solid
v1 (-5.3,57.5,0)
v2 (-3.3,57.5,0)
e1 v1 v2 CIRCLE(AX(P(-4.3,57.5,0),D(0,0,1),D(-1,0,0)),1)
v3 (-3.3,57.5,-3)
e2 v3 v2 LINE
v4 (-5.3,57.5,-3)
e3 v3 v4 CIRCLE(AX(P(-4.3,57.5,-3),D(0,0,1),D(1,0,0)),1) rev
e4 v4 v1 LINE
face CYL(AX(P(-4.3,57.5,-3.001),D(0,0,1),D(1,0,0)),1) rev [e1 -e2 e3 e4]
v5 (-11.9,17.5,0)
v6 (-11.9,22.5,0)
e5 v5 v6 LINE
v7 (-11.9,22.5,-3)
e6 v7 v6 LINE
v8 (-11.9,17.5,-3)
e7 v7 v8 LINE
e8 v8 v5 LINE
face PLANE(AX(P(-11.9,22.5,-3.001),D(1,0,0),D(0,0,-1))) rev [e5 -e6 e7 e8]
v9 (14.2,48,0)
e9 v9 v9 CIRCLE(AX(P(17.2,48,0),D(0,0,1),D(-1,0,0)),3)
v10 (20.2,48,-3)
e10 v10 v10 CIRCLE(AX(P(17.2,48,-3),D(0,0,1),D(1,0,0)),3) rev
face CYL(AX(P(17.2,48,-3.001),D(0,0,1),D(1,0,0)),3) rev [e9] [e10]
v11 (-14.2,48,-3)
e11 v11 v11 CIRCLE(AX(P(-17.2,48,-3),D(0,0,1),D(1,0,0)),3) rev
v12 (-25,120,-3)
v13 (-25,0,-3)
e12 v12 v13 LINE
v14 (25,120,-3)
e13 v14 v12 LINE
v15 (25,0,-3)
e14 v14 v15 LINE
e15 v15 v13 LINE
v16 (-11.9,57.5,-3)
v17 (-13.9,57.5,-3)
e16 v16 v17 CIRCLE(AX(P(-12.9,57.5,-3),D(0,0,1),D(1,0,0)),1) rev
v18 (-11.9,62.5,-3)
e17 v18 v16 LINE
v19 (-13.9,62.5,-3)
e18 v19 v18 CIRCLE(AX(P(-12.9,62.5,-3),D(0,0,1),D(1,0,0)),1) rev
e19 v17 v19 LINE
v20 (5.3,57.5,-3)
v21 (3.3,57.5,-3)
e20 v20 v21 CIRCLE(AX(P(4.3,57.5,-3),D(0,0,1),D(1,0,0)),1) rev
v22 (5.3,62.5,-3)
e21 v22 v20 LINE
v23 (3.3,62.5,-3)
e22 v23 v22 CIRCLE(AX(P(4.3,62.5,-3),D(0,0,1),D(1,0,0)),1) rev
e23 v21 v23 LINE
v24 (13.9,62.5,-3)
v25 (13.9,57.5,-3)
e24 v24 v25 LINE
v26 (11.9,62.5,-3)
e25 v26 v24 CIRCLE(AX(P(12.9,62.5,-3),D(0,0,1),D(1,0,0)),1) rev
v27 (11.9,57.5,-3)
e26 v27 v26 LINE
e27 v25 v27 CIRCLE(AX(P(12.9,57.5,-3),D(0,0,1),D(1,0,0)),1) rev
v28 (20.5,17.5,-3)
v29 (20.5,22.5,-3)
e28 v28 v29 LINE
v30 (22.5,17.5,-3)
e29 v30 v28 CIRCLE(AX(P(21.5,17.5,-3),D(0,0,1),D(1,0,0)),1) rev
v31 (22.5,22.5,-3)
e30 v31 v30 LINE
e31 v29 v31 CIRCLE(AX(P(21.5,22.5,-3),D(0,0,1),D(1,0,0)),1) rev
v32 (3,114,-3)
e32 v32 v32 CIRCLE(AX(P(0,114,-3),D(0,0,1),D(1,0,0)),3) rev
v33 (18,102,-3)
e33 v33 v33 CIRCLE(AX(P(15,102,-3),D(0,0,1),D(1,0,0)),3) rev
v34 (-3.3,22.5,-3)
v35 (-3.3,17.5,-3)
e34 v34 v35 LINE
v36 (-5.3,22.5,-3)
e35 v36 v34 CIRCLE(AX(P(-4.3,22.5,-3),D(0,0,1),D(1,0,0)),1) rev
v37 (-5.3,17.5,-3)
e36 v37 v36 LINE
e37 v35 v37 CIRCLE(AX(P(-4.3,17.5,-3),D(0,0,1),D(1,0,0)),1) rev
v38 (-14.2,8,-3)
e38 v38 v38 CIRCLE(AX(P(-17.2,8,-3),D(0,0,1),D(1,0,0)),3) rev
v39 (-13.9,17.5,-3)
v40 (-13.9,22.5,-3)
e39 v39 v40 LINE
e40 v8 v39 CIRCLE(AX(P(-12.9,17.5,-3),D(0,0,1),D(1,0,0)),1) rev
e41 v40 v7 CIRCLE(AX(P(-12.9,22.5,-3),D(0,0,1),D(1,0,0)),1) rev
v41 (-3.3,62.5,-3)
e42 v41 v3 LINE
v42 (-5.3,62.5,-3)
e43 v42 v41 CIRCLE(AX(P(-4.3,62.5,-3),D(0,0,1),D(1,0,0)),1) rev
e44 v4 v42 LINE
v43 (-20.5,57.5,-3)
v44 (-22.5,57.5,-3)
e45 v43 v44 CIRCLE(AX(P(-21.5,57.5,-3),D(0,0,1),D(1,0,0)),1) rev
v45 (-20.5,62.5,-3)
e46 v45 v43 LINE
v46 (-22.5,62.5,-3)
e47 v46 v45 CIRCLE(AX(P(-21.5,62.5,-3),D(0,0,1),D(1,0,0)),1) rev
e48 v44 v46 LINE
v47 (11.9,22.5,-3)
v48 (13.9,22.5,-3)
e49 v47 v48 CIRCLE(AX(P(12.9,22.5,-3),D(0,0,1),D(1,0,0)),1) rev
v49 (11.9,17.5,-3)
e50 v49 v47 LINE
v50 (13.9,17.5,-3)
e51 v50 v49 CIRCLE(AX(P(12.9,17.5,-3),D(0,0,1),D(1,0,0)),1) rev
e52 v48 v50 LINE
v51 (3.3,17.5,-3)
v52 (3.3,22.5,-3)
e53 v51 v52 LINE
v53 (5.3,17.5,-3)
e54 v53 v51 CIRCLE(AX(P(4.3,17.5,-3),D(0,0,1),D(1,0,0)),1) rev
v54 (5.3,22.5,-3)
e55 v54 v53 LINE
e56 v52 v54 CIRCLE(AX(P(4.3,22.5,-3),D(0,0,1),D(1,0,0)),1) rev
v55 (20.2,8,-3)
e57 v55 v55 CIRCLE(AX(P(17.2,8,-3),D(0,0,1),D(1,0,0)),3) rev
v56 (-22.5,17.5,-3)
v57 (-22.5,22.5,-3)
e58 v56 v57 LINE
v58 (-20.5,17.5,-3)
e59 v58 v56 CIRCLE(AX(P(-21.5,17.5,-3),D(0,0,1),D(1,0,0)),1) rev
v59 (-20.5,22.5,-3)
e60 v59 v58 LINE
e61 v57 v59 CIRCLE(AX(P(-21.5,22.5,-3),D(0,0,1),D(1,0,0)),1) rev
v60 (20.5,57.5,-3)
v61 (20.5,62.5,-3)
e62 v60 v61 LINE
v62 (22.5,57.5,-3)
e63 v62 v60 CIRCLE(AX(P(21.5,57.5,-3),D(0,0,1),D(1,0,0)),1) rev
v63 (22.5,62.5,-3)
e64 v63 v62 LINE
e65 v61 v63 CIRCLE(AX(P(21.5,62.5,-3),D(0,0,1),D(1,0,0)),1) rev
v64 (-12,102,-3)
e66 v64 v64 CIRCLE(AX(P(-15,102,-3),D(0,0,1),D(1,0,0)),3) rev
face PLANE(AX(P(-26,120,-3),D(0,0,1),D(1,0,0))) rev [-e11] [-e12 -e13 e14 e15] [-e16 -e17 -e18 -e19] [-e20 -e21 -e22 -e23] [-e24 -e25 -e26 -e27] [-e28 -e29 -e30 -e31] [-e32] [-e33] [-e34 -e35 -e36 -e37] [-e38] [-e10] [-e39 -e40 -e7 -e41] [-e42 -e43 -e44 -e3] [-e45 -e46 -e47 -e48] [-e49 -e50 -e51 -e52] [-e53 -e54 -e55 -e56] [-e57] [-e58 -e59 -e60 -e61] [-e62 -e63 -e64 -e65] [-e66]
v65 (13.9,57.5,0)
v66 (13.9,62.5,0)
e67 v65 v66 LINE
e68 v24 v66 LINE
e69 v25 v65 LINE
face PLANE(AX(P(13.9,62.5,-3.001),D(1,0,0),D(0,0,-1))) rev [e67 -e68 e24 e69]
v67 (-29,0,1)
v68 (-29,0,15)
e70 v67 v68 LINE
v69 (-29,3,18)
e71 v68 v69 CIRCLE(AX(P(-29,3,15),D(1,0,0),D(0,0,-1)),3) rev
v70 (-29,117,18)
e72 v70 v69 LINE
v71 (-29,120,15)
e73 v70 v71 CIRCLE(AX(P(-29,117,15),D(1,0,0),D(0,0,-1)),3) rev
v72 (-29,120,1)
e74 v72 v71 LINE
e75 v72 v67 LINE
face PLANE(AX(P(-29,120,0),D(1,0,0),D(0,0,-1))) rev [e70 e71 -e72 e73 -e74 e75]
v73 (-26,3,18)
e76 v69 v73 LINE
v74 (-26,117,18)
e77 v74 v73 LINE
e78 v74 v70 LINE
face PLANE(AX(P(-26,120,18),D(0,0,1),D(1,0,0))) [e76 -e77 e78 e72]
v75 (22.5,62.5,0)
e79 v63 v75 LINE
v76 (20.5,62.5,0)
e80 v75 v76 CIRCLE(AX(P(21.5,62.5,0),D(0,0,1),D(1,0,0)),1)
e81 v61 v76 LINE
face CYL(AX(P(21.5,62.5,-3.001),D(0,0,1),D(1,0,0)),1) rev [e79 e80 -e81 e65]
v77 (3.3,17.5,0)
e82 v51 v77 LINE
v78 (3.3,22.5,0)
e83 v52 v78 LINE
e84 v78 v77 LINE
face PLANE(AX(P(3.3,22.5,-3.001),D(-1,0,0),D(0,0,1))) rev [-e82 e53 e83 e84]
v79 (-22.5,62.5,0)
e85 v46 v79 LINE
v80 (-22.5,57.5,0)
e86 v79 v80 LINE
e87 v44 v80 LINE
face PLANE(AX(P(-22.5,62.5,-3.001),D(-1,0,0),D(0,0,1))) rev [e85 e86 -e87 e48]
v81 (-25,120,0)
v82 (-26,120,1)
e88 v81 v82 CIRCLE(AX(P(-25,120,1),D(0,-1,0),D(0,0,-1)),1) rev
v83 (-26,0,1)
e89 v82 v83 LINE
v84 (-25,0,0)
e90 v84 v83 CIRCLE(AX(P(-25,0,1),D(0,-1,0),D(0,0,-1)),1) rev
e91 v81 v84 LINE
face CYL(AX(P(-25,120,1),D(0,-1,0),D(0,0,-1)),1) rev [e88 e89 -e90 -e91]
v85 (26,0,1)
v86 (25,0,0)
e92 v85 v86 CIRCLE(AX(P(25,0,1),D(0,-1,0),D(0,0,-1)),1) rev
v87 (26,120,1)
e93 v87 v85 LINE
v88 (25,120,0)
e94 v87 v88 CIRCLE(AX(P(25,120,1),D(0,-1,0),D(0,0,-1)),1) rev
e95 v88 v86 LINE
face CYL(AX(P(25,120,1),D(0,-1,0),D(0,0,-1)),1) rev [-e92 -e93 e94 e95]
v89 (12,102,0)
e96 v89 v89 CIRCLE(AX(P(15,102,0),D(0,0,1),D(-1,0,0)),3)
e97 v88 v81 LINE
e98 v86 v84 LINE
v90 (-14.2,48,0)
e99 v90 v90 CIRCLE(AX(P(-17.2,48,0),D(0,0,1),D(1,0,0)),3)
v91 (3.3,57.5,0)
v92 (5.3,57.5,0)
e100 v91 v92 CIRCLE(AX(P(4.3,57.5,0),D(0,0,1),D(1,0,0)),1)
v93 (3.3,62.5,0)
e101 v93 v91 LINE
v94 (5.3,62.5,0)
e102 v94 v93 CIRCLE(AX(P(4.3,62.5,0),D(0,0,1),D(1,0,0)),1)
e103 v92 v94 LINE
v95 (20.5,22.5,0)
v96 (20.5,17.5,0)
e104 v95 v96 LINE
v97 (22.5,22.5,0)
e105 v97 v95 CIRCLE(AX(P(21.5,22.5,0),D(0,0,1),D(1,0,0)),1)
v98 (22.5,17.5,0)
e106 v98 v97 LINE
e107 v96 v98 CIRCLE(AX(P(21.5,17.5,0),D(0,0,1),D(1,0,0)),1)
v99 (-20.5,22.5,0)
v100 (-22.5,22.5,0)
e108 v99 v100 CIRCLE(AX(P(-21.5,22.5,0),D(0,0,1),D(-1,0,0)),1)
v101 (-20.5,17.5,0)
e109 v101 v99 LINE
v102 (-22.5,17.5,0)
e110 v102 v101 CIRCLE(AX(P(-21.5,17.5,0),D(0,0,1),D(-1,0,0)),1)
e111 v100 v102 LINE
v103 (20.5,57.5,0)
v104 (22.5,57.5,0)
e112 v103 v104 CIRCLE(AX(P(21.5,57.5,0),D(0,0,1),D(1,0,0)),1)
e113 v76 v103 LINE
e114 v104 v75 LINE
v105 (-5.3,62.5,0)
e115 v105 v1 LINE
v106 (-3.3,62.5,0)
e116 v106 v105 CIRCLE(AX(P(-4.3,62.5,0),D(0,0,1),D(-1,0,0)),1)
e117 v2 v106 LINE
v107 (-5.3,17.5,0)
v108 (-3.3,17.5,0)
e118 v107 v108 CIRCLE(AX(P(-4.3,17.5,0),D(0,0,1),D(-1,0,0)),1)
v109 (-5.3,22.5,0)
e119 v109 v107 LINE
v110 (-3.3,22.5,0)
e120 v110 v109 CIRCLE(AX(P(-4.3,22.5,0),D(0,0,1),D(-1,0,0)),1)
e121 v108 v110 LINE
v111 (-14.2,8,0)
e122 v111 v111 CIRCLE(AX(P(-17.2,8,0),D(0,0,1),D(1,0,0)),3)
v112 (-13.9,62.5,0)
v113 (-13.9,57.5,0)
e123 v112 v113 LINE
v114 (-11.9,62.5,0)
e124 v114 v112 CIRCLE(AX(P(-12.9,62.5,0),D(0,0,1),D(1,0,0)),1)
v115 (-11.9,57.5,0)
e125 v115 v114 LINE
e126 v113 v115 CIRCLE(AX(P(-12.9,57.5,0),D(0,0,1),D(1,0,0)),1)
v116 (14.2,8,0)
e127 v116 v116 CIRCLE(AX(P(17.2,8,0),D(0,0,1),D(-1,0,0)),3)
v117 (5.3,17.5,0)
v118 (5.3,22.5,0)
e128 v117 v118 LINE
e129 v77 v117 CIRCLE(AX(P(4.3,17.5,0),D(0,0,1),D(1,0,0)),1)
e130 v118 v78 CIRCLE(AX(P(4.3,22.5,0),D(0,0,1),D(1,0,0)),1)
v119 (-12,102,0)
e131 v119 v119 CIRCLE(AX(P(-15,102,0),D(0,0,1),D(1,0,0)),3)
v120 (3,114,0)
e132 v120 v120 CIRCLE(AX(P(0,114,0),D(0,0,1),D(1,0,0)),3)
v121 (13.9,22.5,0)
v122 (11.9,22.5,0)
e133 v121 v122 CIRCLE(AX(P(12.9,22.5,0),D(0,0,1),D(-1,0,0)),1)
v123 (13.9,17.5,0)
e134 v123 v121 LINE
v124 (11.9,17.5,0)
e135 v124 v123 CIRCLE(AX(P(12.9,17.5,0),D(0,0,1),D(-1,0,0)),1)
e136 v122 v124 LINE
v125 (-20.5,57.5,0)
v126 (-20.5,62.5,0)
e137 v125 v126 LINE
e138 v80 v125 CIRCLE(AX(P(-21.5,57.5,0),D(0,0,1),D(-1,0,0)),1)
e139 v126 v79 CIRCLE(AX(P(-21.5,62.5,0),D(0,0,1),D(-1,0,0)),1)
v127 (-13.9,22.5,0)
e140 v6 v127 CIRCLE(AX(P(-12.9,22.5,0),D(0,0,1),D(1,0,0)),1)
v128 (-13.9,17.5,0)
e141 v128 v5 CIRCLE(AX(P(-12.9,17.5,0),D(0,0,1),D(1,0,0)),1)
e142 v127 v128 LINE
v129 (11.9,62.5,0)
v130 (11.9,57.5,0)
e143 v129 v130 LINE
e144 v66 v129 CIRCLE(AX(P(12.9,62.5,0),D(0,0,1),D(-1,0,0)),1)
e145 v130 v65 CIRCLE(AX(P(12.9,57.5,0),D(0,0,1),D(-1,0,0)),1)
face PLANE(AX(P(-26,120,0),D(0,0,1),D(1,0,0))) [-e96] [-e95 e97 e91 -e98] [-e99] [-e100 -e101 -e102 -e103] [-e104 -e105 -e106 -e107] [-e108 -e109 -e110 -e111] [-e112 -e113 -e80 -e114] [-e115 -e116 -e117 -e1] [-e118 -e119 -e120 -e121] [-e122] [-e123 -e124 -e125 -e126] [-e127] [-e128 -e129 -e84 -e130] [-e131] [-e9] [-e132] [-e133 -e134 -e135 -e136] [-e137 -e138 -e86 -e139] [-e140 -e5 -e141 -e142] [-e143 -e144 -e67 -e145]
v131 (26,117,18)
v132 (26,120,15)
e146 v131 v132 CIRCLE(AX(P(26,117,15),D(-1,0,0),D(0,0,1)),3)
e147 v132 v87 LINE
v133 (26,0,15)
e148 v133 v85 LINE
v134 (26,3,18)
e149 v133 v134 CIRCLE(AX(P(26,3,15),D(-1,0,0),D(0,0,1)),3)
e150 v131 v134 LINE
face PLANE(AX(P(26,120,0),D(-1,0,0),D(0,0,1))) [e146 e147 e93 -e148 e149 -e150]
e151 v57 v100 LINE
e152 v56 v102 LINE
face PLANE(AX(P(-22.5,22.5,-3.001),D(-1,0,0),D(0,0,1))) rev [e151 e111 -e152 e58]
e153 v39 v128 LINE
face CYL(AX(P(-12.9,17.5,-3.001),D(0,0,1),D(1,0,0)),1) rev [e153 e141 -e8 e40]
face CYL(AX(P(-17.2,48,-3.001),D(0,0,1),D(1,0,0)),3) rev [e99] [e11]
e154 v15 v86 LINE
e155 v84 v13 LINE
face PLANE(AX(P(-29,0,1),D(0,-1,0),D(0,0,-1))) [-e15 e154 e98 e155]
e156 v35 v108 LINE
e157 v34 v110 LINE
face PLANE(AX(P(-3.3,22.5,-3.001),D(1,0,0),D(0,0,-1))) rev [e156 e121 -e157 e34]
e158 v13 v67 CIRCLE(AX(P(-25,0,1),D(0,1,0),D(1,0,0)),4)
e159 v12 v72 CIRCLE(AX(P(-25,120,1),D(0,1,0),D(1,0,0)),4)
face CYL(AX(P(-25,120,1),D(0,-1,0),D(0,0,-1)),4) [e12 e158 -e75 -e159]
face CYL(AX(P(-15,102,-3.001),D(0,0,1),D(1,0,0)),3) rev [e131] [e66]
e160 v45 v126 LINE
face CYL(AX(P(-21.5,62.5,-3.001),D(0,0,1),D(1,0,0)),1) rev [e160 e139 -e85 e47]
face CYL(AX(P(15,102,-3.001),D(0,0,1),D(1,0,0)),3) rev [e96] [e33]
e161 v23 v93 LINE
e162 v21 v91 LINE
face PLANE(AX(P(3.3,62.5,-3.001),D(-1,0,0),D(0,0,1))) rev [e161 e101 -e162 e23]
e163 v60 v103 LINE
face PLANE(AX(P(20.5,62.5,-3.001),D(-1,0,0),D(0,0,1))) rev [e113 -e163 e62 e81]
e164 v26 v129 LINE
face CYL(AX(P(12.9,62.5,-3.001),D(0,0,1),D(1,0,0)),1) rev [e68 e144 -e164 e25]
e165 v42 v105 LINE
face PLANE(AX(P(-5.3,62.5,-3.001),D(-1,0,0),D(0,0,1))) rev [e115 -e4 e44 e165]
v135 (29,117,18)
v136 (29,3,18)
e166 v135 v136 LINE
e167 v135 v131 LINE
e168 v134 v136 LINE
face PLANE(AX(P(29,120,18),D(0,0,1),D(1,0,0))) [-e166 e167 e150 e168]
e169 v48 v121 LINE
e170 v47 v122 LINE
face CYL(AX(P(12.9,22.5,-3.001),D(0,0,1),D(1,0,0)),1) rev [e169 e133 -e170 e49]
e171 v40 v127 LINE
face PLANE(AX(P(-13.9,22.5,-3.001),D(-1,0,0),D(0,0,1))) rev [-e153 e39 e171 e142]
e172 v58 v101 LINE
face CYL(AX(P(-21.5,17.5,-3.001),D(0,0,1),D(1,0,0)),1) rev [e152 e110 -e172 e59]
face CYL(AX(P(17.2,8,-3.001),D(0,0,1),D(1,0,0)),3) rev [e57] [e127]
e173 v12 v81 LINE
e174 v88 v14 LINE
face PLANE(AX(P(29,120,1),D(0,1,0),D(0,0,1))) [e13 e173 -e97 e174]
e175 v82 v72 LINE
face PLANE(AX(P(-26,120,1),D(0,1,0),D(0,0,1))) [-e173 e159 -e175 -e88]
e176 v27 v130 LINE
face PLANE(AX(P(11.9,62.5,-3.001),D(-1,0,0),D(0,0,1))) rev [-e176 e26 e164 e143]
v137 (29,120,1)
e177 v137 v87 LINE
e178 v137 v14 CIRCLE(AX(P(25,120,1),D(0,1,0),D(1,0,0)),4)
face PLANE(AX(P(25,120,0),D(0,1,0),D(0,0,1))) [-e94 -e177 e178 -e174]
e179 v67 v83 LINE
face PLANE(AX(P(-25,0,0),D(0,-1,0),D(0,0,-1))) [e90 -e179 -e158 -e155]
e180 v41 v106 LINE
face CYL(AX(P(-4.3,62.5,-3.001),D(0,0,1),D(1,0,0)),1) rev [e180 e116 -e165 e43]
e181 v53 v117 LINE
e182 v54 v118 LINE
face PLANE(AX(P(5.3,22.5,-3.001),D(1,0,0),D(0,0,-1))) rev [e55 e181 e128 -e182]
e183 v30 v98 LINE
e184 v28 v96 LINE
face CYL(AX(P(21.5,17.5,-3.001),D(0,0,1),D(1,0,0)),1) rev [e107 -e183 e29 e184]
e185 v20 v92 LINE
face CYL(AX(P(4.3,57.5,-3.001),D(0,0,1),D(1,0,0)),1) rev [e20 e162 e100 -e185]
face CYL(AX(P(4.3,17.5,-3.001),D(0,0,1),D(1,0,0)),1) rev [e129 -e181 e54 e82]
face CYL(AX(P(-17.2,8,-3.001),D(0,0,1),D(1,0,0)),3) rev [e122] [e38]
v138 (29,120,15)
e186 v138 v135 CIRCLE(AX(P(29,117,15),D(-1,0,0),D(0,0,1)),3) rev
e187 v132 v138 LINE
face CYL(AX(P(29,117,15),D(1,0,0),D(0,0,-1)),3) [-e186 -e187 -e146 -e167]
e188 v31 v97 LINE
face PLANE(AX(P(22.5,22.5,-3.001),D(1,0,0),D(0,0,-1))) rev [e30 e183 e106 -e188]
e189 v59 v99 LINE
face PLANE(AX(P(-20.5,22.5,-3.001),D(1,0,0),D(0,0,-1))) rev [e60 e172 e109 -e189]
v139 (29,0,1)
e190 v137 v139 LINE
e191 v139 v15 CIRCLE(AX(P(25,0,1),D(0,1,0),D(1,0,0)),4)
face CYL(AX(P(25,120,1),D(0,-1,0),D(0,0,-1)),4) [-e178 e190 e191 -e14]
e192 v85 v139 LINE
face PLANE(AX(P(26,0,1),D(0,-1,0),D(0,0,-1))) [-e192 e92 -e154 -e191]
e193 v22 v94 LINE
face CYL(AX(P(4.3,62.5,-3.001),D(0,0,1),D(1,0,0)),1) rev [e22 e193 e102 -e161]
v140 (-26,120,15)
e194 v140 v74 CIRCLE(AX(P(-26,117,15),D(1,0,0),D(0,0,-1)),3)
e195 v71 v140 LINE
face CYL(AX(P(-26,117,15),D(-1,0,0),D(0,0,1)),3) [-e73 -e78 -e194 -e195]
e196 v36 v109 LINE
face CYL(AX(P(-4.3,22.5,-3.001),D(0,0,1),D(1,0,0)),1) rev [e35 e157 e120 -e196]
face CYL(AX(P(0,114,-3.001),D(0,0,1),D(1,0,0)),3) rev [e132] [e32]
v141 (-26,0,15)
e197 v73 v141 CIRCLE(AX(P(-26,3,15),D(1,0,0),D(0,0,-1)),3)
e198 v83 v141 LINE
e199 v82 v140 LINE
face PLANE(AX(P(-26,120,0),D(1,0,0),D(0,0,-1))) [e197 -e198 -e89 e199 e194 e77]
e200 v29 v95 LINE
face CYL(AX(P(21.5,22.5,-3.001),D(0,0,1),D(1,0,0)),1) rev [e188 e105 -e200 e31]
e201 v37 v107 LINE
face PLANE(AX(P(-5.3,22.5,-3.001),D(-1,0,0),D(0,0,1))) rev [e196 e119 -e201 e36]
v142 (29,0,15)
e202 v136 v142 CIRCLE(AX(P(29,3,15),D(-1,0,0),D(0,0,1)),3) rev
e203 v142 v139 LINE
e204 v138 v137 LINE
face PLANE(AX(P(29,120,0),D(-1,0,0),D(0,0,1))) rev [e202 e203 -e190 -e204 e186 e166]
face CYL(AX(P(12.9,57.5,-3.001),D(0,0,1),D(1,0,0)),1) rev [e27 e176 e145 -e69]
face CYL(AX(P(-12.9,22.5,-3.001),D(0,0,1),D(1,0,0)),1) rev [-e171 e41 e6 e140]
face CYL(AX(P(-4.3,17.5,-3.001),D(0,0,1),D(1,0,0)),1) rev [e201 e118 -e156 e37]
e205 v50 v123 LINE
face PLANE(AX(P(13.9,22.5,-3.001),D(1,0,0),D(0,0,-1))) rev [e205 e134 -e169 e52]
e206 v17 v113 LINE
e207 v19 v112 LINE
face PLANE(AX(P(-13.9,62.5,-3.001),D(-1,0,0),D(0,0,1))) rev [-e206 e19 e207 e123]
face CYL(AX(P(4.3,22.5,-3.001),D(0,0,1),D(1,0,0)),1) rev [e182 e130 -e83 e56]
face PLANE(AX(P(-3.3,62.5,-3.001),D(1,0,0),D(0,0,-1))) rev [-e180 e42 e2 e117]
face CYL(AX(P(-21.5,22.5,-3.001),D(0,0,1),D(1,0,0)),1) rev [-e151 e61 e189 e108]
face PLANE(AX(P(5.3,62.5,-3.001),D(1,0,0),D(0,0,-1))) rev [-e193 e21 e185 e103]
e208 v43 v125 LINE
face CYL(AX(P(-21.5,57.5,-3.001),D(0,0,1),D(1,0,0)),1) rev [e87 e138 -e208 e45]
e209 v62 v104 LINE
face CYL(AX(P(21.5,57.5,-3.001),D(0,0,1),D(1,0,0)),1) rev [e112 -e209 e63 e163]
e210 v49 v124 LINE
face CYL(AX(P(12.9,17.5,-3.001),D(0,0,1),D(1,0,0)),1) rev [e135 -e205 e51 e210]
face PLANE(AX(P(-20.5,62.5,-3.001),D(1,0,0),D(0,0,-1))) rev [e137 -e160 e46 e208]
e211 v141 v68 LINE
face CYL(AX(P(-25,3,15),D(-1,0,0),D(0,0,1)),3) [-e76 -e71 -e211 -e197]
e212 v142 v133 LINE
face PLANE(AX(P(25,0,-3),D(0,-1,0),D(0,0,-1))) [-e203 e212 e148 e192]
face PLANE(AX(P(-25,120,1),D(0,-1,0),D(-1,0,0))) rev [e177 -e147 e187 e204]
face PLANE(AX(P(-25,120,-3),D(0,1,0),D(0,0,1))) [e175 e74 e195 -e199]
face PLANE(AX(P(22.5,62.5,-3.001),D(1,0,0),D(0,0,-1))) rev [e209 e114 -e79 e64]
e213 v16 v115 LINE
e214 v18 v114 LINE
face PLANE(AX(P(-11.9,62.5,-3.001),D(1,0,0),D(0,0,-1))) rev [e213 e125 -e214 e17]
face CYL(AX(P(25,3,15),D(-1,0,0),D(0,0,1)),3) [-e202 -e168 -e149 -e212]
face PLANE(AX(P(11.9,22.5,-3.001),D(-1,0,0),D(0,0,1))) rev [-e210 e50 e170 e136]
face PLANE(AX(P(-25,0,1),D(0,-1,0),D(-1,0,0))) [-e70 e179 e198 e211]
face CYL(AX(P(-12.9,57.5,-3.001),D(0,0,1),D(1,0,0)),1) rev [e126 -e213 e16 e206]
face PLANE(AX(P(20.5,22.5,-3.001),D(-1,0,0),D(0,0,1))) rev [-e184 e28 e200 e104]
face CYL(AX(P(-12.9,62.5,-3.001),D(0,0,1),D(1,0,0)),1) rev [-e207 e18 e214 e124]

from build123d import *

# Parameters (mm, degrees)
BASE_FLANGE1_DEPTH = 120
CUT_EXTRUDE1_REACH = 126.76
SKETCH6_R          = 3
LPATTERN1_COUNT    = 2
LPATTERN1_PITCH    = 40
FILLET1_R          = 3
CUT_EXTRUDE2_REACH = 126.76
SKETCH7_R          = 3


# Sheet-metal steps are written as plain solids
with BuildPart() as part:
    # Sketch1 → Base-Flange1 (new body)
    with BuildSketch(Plane(origin=(0, 0, 0), x_dir=(1, 0, 0), z_dir=(0, 1, 0))):
        with BuildLine():
            Line((-26, -18), (-26, -1))
            ThreePointArc((-26, -1), (-25.707106781, -0.292893219), (-25, 0))
            Line((-25, 0), (25, 0))
            ThreePointArc((25, 0), (25.707106781, -0.292893219), (26, -1))
            Line((26, -1), (26, -18))
            Line((26, -18), (29, -18))
            Line((29, -18), (29, -1))
            ThreePointArc((29, -1), (27.828427125, 1.828427125), (25, 3))
            Line((25, 3), (-25, 3))
            ThreePointArc((-25, 3), (-27.828427125, 1.828427125), (-29, -1))
            Line((-29, -1), (-29, -18))
            Line((-29, -18), (-26, -18))
        make_face()
    extrude(amount=BASE_FLANGE1_DEPTH)

    # Sketch6 → Cut-Extrude1 (cut, up to next)
    with BuildSketch(Plane.XY, mode=Mode.PRIVATE) as cut_extrude1_sk1:
        with Locations((-17.2, 8)):
            Circle(SKETCH6_R)
    cut_extrude1_tool1 = extrude(cut_extrude1_sk1.sketch, amount=-CUT_EXTRUDE1_REACH, mode=Mode.PRIVATE) & part.part
    # Sketch6 → Cut-Extrude1 (cut, up to next)
    with BuildSketch(Plane.XY, mode=Mode.PRIVATE) as cut_extrude1_sk2:
        with Locations((17.2, 8)):
            Circle(SKETCH6_R)
    cut_extrude1_tool2 = extrude(cut_extrude1_sk2.sketch, amount=-CUT_EXTRUDE1_REACH, mode=Mode.PRIVATE) & part.part
    # Sketch6 → Cut-Extrude1 (cut, up to next)
    with BuildSketch(Plane.XY, mode=Mode.PRIVATE) as cut_extrude1_sk3:
        with BuildLine():
            Line((-11.9, 22.5), (-11.9, 17.5))
            ThreePointArc((-11.9, 17.5), (-12.9, 16.5), (-13.9, 17.5))
            Line((-13.9, 17.5), (-13.9, 22.5))
            ThreePointArc((-13.9, 22.5), (-12.9, 23.5), (-11.9, 22.5))
        make_face()
    cut_extrude1_tool3 = extrude(cut_extrude1_sk3.sketch, amount=-CUT_EXTRUDE1_REACH, mode=Mode.PRIVATE) & part.part
    # Sketch6 → Cut-Extrude1 (cut, up to next)
    with BuildSketch(Plane.XY, mode=Mode.PRIVATE) as cut_extrude1_sk4:
        with BuildLine():
            Line((-22.5, 22.5), (-22.5, 17.5))
            ThreePointArc((-22.5, 17.5), (-21.5, 16.5), (-20.5, 17.5))
            Line((-20.5, 17.5), (-20.5, 22.5))
            ThreePointArc((-20.5, 22.5), (-21.5, 23.5), (-22.5, 22.5))
        make_face()
    cut_extrude1_tool4 = extrude(cut_extrude1_sk4.sketch, amount=-CUT_EXTRUDE1_REACH, mode=Mode.PRIVATE) & part.part
    # Sketch6 → Cut-Extrude1 (cut, up to next)
    with BuildSketch(Plane.XY, mode=Mode.PRIVATE) as cut_extrude1_sk5:
        with BuildLine():
            Line((5.3, 22.5), (5.3, 17.5))
            ThreePointArc((5.3, 17.5), (4.3, 16.5), (3.3, 17.5))
            Line((3.3, 17.5), (3.3, 22.5))
            ThreePointArc((3.3, 22.5), (4.3, 23.5), (5.3, 22.5))
        make_face()
    cut_extrude1_tool5 = extrude(cut_extrude1_sk5.sketch, amount=-CUT_EXTRUDE1_REACH, mode=Mode.PRIVATE) & part.part
    # Sketch6 → Cut-Extrude1 (cut, up to next)
    with BuildSketch(Plane.XY, mode=Mode.PRIVATE) as cut_extrude1_sk6:
        with BuildLine():
            Line((-5.3, 22.5), (-5.3, 17.5))
            ThreePointArc((-5.3, 17.5), (-4.3, 16.5), (-3.3, 17.5))
            Line((-3.3, 17.5), (-3.3, 22.5))
            ThreePointArc((-3.3, 22.5), (-4.3, 23.5), (-5.3, 22.5))
        make_face()
    cut_extrude1_tool6 = extrude(cut_extrude1_sk6.sketch, amount=-CUT_EXTRUDE1_REACH, mode=Mode.PRIVATE) & part.part
    # Sketch6 → Cut-Extrude1 (cut, up to next)
    with BuildSketch(Plane.XY, mode=Mode.PRIVATE) as cut_extrude1_sk7:
        with BuildLine():
            Line((22.5, 22.5), (22.5, 17.5))
            ThreePointArc((22.5, 17.5), (21.5, 16.5), (20.5, 17.5))
            Line((20.5, 17.5), (20.5, 22.5))
            ThreePointArc((20.5, 22.5), (21.5, 23.5), (22.5, 22.5))
        make_face()
    cut_extrude1_tool7 = extrude(cut_extrude1_sk7.sketch, amount=-CUT_EXTRUDE1_REACH, mode=Mode.PRIVATE) & part.part
    # Sketch6 → Cut-Extrude1 (cut, up to next)
    with BuildSketch(Plane.XY, mode=Mode.PRIVATE) as cut_extrude1_sk8:
        with BuildLine():
            Line((11.9, 22.5), (11.9, 17.5))
            ThreePointArc((11.9, 17.5), (12.9, 16.5), (13.9, 17.5))
            Line((13.9, 17.5), (13.9, 22.5))
            ThreePointArc((13.9, 22.5), (12.9, 23.5), (11.9, 22.5))
        make_face()
    cut_extrude1_tool8 = extrude(cut_extrude1_sk8.sketch, amount=-CUT_EXTRUDE1_REACH, mode=Mode.PRIVATE) & part.part
    cut_extrude1_1 = cut_extrude1_tool1.solids().sort_by_distance((-17.2, 8, 0))[0]
    add(cut_extrude1_1, mode=Mode.SUBTRACT)
    cut_extrude1_2 = cut_extrude1_tool2.solids().sort_by_distance((17.2, 8, 0))[0]
    add(cut_extrude1_2, mode=Mode.SUBTRACT)
    cut_extrude1_3 = cut_extrude1_tool3.solids().sort_by_distance((-12.9, 20, 0))[0]
    add(cut_extrude1_3, mode=Mode.SUBTRACT)
    cut_extrude1_4 = cut_extrude1_tool4.solids().sort_by_distance((-21.5, 20, 0))[0]
    add(cut_extrude1_4, mode=Mode.SUBTRACT)
    cut_extrude1_5 = cut_extrude1_tool5.solids().sort_by_distance((4.3, 20, 0))[0]
    add(cut_extrude1_5, mode=Mode.SUBTRACT)
    cut_extrude1_6 = cut_extrude1_tool6.solids().sort_by_distance((-4.3, 20, 0))[0]
    add(cut_extrude1_6, mode=Mode.SUBTRACT)
    cut_extrude1_7 = cut_extrude1_tool7.solids().sort_by_distance((21.5, 20, 0))[0]
    add(cut_extrude1_7, mode=Mode.SUBTRACT)
    cut_extrude1_8 = cut_extrude1_tool8.solids().sort_by_distance((12.9, 20, 0))[0]
    add(cut_extrude1_8, mode=Mode.SUBTRACT)
    cut_extrude1 = cut_extrude1_1 + cut_extrude1_2 + cut_extrude1_3 + cut_extrude1_4 + cut_extrude1_5 + cut_extrude1_6 + cut_extrude1_7 + cut_extrude1_8  # Cut-Extrude1 as one shape, for the pattern or mirror that repeats it

    # LPattern1: Cut-Extrude1 ×2
    with Locations(*[(0, i * LPATTERN1_PITCH, 0) for i in range(1, LPATTERN1_COUNT)]):
        add(cut_extrude1, mode=Mode.SUBTRACT)

    # Fillet1
    fillet1_edges = [part.edges().sort_by_distance(p)[0] for p in [
        (27.5, 0, 18),
        (-27.5, 0, 18),
        (27.5, 120, 18),
        (-27.5, 120, 18),
    ]]
    fillet(fillet1_edges, radius=FILLET1_R)

    # Sketch7 → Cut-Extrude2 (cut, up to next)
    with BuildSketch(Plane.XY, mode=Mode.PRIVATE) as cut_extrude2_sk1:
        with Locations((0, 114)):
            Circle(SKETCH7_R)
    cut_extrude2_tool1 = extrude(cut_extrude2_sk1.sketch, amount=-CUT_EXTRUDE2_REACH, mode=Mode.PRIVATE) & part.part
    # Sketch7 → Cut-Extrude2 (cut, up to next)
    with BuildSketch(Plane.XY, mode=Mode.PRIVATE) as cut_extrude2_sk2:
        with Locations((-15, 102)):
            Circle(SKETCH7_R)
    cut_extrude2_tool2 = extrude(cut_extrude2_sk2.sketch, amount=-CUT_EXTRUDE2_REACH, mode=Mode.PRIVATE) & part.part
    # Sketch7 → Cut-Extrude2 (cut, up to next)
    with BuildSketch(Plane.XY, mode=Mode.PRIVATE) as cut_extrude2_sk3:
        with Locations((15, 102)):
            Circle(SKETCH7_R)
    cut_extrude2_tool3 = extrude(cut_extrude2_sk3.sketch, amount=-CUT_EXTRUDE2_REACH, mode=Mode.PRIVATE) & part.part
    add(cut_extrude2_tool1.solids().sort_by_distance((0, 114, 0))[0], mode=Mode.SUBTRACT)
    add(cut_extrude2_tool2.solids().sort_by_distance((-15, 102, 0))[0], mode=Mode.SUBTRACT)
    add(cut_extrude2_tool3.solids().sort_by_distance((15, 102, 0))[0], mode=Mode.SUBTRACT)


solid = part.part
